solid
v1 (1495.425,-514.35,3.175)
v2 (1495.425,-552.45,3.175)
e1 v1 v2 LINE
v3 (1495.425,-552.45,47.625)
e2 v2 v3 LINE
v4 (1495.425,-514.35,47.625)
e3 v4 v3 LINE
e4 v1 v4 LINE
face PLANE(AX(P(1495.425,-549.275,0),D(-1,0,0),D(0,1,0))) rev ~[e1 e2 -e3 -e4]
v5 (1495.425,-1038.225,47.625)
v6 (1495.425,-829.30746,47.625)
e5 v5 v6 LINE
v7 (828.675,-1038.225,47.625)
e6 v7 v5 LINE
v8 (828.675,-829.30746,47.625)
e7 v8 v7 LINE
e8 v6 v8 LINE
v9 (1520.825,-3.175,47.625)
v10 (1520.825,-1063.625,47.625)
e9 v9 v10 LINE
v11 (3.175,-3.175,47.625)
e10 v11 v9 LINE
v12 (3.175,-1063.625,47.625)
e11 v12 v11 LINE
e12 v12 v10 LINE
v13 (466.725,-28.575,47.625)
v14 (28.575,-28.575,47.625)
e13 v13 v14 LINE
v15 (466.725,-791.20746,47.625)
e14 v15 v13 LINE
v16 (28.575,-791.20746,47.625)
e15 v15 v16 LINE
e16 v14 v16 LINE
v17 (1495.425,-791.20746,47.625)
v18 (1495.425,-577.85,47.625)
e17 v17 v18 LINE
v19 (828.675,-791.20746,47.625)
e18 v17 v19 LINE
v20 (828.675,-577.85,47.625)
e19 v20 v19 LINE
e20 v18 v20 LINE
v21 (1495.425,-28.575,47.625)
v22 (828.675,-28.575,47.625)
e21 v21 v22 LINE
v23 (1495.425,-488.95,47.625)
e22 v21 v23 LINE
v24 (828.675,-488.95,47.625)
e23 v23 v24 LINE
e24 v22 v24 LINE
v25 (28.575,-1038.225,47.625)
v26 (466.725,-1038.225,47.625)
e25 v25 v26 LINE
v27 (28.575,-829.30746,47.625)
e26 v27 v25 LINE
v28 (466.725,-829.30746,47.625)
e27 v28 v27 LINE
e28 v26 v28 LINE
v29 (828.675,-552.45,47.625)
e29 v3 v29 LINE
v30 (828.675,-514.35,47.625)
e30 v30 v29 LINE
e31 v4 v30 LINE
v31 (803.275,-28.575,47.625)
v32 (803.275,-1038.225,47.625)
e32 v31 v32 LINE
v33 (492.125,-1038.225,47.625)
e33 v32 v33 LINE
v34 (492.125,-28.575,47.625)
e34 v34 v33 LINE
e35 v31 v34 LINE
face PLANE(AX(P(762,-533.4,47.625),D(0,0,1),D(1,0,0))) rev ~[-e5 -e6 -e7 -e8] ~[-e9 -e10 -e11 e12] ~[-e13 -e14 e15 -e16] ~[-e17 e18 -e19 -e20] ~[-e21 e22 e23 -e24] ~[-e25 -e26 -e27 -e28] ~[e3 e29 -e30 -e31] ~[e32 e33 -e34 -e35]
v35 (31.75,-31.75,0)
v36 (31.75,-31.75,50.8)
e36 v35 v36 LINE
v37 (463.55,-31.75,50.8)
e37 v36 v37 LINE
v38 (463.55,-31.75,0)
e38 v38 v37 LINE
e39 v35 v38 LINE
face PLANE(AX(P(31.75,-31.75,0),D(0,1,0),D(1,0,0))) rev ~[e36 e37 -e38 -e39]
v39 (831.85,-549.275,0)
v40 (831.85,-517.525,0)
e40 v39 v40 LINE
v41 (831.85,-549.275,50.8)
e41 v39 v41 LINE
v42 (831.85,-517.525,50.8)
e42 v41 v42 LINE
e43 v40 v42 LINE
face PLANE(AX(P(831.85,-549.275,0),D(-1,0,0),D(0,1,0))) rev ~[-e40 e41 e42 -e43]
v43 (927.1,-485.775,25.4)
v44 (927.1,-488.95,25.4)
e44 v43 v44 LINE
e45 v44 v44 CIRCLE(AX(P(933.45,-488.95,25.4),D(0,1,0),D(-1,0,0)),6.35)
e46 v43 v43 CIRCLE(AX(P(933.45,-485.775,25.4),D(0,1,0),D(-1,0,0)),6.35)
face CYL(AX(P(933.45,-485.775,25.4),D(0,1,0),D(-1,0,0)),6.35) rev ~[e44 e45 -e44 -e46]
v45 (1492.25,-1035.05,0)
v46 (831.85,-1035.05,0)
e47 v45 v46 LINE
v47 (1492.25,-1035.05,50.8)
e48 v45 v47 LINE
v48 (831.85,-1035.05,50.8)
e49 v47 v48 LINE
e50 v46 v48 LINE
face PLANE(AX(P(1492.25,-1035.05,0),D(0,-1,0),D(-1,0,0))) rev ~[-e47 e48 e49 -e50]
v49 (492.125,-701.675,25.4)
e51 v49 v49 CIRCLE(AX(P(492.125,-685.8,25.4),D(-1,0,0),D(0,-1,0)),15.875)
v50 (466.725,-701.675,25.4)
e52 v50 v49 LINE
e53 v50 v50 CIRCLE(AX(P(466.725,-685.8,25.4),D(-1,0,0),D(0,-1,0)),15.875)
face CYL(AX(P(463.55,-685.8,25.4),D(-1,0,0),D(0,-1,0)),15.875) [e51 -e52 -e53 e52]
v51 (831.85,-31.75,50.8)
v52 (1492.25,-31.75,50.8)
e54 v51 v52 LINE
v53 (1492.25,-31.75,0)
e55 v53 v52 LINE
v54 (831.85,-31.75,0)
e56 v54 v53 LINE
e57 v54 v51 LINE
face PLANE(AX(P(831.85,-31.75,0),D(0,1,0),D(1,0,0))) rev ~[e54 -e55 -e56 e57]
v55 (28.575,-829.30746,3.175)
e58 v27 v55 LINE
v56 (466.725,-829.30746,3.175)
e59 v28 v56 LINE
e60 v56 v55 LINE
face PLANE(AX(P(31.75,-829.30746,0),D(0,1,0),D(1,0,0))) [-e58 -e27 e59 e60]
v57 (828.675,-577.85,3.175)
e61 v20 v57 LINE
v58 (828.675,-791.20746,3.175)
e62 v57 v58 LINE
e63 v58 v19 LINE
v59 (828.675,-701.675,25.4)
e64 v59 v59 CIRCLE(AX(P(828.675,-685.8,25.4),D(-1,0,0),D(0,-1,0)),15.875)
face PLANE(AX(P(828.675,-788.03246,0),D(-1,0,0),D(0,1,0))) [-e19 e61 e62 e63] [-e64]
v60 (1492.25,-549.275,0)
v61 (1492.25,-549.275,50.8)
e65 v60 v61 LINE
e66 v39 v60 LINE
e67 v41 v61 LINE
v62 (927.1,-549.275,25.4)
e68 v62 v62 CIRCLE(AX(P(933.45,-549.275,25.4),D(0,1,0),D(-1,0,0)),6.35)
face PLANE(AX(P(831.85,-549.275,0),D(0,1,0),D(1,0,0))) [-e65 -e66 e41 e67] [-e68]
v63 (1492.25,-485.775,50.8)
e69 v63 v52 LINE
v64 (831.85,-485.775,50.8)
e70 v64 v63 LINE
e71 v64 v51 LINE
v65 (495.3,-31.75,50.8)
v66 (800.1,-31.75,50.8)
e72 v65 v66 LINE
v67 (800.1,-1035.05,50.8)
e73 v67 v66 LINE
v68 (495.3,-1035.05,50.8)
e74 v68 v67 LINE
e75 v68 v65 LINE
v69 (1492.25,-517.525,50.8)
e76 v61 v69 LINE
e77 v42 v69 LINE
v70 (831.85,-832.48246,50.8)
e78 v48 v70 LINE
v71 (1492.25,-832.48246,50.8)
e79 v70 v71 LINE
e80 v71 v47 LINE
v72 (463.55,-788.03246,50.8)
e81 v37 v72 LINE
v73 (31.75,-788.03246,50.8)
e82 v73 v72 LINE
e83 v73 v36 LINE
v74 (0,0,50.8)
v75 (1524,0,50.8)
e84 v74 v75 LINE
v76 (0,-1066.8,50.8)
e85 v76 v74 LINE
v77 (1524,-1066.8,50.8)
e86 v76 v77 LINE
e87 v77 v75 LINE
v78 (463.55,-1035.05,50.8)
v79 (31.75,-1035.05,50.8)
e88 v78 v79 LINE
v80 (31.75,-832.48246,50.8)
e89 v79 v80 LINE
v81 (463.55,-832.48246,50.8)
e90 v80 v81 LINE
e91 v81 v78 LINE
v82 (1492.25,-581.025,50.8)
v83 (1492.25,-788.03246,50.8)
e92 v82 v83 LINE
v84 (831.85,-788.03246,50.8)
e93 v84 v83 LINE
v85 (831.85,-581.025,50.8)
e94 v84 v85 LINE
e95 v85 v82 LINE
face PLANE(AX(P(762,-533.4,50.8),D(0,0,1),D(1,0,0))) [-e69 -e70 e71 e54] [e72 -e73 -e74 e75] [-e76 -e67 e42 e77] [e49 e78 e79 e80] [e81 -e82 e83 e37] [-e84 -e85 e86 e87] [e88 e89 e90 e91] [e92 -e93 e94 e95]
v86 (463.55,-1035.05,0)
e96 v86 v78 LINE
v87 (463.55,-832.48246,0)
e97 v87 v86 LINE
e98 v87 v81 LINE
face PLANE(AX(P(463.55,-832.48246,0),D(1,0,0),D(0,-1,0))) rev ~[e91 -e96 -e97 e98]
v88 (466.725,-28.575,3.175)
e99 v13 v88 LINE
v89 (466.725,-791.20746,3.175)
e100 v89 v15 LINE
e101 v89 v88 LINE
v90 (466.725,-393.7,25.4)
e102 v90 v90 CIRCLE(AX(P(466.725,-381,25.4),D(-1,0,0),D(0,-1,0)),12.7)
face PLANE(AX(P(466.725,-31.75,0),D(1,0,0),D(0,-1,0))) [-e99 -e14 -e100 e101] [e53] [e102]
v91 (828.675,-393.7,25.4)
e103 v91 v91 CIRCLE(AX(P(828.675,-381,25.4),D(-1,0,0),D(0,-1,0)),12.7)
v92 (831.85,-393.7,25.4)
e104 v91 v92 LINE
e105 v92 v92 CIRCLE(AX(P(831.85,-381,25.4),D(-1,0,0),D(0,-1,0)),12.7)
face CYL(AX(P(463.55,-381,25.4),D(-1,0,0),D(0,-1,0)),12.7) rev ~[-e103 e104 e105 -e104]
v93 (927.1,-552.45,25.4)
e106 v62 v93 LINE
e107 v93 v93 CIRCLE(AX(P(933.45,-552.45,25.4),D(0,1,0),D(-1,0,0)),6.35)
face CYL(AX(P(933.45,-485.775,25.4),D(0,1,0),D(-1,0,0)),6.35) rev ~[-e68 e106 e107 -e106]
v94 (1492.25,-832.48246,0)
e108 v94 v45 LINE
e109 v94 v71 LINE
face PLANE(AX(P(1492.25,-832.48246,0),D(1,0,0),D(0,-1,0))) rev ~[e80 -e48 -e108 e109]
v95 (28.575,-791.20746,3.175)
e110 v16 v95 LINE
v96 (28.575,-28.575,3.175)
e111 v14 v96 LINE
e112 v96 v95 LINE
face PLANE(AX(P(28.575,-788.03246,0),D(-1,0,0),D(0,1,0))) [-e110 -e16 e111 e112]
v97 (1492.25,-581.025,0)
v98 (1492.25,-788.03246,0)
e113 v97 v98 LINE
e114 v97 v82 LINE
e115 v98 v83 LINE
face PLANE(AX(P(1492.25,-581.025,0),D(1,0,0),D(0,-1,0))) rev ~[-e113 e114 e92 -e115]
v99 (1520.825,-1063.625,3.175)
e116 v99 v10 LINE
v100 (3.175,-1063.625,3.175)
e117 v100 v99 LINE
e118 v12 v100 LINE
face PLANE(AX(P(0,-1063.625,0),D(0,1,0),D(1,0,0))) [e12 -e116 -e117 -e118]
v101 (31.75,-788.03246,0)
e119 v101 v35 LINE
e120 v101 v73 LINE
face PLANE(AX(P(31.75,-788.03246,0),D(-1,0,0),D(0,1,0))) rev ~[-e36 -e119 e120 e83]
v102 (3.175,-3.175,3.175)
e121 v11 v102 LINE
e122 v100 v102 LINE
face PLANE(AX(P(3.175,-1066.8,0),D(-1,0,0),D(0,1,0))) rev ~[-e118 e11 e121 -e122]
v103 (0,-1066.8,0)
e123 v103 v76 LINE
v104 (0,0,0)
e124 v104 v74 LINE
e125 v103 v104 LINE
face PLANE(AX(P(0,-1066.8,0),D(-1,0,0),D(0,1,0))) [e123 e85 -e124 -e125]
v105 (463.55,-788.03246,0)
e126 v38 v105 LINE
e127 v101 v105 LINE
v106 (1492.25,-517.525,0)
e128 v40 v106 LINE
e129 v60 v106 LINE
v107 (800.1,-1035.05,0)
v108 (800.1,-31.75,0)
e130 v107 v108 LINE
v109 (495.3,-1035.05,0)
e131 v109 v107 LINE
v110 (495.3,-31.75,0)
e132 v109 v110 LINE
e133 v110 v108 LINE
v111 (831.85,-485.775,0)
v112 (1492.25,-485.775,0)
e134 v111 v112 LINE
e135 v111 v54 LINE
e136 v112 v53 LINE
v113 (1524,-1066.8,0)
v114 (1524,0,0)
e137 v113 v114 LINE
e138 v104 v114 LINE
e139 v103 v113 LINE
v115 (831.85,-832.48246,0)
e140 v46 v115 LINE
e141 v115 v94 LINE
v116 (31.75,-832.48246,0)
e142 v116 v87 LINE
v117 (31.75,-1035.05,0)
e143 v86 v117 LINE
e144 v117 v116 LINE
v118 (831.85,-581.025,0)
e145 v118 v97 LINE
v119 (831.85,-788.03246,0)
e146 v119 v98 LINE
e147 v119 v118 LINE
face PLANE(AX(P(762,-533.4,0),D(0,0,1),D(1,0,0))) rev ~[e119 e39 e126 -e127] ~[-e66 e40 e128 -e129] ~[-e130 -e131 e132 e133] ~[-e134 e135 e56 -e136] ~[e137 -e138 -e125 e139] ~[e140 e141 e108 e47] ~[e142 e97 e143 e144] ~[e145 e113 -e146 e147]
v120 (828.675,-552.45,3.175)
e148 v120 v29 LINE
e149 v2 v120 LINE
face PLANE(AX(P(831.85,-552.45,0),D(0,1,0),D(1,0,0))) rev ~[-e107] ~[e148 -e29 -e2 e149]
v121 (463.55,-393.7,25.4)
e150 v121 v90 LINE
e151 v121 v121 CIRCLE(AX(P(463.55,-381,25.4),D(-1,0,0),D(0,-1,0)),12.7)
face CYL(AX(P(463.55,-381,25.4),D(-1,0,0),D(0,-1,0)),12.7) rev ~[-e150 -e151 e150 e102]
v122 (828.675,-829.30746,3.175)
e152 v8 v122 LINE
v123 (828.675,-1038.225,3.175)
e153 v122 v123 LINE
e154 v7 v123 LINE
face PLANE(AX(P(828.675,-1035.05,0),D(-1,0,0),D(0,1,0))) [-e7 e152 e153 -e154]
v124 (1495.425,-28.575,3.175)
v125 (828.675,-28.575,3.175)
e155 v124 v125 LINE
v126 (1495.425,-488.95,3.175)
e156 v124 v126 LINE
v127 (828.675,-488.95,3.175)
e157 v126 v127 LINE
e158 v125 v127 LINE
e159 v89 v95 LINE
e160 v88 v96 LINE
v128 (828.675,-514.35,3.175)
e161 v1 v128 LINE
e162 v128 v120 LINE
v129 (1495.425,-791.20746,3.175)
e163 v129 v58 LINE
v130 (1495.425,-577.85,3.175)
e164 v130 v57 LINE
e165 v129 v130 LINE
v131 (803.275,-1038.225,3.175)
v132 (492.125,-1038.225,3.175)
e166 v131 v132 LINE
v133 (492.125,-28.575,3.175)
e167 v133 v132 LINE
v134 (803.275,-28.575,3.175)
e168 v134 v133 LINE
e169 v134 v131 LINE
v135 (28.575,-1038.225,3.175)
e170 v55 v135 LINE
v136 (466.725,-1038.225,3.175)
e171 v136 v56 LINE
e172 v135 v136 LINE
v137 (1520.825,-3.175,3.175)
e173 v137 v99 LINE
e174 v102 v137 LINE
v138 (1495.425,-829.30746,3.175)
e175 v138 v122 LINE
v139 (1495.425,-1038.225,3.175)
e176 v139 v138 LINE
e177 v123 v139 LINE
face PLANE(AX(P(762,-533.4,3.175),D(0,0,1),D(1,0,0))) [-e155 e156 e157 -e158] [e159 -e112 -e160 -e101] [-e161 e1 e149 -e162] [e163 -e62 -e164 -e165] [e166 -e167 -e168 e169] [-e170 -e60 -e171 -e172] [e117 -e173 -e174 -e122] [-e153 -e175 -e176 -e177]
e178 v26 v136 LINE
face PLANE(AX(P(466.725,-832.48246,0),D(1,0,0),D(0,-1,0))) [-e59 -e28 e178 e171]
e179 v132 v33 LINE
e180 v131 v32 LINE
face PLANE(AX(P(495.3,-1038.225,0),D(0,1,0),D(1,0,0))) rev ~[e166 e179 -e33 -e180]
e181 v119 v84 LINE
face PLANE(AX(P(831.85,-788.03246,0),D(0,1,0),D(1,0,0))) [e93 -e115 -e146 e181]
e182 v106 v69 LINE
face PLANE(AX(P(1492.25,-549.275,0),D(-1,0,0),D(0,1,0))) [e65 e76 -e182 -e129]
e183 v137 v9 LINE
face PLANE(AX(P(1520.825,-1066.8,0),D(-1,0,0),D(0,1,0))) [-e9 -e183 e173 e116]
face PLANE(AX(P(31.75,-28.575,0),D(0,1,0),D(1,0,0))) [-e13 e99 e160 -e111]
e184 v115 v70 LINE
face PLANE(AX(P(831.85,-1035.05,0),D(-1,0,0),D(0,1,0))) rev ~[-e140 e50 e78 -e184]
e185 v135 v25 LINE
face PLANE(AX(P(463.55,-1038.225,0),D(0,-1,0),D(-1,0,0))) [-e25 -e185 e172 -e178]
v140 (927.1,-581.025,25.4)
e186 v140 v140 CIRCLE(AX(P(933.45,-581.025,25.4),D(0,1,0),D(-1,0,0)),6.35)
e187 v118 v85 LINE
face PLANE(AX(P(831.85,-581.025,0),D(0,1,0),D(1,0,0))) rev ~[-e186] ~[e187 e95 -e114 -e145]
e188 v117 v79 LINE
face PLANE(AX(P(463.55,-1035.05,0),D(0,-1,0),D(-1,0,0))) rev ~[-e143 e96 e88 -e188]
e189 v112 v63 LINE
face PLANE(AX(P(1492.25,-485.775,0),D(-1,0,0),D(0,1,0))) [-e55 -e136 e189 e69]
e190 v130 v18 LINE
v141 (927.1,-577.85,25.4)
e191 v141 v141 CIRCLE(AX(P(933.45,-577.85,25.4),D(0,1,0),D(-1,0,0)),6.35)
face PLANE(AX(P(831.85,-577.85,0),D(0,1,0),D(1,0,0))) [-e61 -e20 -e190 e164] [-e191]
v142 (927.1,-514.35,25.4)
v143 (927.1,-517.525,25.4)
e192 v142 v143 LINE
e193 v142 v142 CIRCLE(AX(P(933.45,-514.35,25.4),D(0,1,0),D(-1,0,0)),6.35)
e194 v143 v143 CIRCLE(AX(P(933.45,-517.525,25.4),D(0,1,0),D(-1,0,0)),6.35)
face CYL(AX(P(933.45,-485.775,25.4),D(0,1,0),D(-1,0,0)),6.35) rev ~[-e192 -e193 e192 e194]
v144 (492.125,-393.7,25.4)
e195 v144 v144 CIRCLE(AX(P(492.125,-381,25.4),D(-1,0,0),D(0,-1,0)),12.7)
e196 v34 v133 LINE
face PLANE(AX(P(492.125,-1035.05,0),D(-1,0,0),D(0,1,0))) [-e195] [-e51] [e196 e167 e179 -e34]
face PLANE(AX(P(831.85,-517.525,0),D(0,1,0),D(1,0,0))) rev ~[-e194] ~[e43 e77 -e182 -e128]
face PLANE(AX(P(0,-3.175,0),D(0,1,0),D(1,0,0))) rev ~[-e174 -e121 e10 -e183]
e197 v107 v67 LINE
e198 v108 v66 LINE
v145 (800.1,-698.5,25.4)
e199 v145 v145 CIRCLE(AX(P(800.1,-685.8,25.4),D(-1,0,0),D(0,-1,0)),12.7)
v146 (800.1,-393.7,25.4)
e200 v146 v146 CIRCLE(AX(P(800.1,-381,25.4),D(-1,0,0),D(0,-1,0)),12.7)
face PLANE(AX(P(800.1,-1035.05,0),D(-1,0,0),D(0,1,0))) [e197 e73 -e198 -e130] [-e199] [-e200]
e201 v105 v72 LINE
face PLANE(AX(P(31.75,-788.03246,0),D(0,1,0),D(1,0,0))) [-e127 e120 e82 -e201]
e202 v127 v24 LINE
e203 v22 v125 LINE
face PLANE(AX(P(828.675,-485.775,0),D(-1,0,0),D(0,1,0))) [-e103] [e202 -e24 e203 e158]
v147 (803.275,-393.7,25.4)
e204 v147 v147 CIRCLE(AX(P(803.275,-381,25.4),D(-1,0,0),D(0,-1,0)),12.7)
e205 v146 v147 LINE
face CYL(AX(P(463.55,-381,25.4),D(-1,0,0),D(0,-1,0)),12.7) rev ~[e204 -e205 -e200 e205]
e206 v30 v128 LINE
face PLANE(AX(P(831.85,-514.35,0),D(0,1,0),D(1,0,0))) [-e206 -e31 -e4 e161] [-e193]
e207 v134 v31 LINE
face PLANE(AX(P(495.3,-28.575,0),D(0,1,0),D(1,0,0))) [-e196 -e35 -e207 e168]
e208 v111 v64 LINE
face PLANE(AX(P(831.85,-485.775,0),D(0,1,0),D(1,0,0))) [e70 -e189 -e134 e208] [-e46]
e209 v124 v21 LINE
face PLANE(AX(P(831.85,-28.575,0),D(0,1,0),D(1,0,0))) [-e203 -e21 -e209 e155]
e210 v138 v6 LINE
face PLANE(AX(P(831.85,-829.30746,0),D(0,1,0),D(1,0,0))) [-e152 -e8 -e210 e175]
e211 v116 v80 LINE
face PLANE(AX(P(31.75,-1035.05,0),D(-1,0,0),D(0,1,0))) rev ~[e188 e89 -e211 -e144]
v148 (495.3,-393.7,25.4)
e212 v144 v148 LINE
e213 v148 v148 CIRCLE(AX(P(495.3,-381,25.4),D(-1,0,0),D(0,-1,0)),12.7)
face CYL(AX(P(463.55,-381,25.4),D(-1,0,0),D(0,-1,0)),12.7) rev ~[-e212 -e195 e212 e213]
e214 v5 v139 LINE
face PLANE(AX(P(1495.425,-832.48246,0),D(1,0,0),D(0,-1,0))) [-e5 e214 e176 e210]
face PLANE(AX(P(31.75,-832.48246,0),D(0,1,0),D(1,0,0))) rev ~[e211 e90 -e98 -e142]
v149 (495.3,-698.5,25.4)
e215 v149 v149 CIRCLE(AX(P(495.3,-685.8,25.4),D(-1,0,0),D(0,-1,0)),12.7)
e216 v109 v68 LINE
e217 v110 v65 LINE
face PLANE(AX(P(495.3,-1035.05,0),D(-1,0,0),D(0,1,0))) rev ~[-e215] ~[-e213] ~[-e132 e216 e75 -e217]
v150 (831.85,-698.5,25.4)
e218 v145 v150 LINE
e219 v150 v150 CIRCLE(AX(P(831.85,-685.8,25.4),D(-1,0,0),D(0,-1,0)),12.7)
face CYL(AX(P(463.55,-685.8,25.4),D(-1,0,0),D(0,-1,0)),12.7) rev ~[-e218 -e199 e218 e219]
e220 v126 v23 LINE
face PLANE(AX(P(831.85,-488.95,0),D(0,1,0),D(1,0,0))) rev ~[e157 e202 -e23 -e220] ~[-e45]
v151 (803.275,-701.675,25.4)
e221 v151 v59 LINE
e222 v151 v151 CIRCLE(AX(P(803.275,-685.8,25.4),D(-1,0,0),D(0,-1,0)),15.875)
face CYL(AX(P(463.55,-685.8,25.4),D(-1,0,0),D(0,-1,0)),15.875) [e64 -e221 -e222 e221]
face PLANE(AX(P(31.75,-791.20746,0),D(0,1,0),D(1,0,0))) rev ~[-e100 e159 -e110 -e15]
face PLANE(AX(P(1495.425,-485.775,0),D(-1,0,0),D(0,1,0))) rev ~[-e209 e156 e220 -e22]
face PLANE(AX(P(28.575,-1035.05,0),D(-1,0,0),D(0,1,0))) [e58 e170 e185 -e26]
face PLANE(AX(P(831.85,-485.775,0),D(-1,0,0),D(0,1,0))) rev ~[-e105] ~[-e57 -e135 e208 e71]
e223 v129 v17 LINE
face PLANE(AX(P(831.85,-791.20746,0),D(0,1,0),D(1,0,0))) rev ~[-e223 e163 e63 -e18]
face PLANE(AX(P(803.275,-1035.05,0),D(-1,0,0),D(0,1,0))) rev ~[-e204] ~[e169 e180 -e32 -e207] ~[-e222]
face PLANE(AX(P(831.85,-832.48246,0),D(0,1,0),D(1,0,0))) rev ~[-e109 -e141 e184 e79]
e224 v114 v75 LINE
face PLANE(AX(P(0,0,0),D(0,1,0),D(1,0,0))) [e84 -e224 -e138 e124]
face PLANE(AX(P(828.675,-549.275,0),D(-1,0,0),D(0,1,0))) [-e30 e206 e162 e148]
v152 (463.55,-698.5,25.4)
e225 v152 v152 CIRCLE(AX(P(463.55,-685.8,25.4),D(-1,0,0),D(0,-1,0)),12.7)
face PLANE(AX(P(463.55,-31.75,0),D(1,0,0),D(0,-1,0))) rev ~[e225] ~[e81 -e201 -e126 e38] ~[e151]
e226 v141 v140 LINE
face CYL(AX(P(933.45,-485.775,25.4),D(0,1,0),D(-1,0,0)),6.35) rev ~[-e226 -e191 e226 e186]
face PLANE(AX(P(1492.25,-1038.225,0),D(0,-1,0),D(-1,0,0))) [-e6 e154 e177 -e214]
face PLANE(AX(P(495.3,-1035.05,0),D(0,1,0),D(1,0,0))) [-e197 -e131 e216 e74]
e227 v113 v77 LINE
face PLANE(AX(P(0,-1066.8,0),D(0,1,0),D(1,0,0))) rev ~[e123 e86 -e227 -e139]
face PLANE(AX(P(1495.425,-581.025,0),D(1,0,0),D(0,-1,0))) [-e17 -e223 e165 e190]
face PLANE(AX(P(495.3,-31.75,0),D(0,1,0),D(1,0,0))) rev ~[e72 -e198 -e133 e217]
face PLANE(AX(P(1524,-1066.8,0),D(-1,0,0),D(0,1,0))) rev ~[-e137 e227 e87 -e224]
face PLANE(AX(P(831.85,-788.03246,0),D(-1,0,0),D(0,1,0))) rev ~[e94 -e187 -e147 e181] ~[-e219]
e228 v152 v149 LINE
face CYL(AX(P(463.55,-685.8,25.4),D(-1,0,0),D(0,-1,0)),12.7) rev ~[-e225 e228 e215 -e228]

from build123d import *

# Parameters (mm, degrees)
F0_W     = 1524
F0_H     = 1066.8
F0_W_2   = 304.8
F0_H_2   = 1003.3
F0_W_3   = 660.4
F0_H_3   = 31.75
F0_H_4   = 454.025
F0_W_4   = 431.8
F0_H_5   = 44.45
F1_DEPTH = 50.8
F2_R     = 12.7
F3_DEPTH = 406.4
F4_R     = 6.35
F5_DEPTH = 127
F6_T     = -3.175


# Not quite as in the source:
# - a feature names something its author has since deleted; it is built from what else it names


with BuildPart() as f1:
    # F0 (on Top) → F1 (new body)
    with BuildSketch(Plane.XY):
        with Locations((762, -533.4)):
            Rectangle(F0_W, F0_H)
        Polygon((1492.25, -1035.05), (831.85, -1035.05), (831.85, -832.48246), (831.85, -788.03246), (831.85, -581.025), (1492.25, -581.025), (1492.25, -788.03246), (1492.25, -832.48246), align=None, mode=Mode.SUBTRACT)
        Polygon((31.75, -788.03246), (31.75, -31.75), (463.55, -31.75), (463.55, -788.03246), (463.55, -832.48246), (463.55, -1035.05), (31.75, -1035.05), (31.75, -832.48246), align=None, mode=Mode.SUBTRACT)
        with Locations((647.7, -533.4)):
            Rectangle(F0_W_2, F0_H_2, mode=Mode.SUBTRACT)
        with Locations((1162.05, -533.4)):
            Rectangle(F0_W_3, F0_H_3, mode=Mode.SUBTRACT)
        with Locations((1162.05, -258.7625)):
            Rectangle(F0_W_3, F0_H_4, mode=Mode.SUBTRACT)
        with Locations((247.65, -810.25746)):
            Rectangle(F0_W_4, F0_H_5)
        with Locations((1162.05, -810.25746)):
            Rectangle(F0_W_3, F0_H_5)
    extrude(amount=F1_DEPTH)

    # F2 (on face) → F3 (cut)
    with BuildSketch(Plane(origin=(463.55, 0, 0), x_dir=(0, -1, 0), z_dir=(-1, 0, 0))):
        with Locations((381, 25.4)):
            Circle(F2_R)
        with Locations((685.8, 25.4)):
            Circle(F2_R)
    extrude(amount=-F3_DEPTH, mode=Mode.SUBTRACT)

    # F4 (on face) → F5 (cut)
    with BuildSketch(Plane(origin=(0, -485.775, 0), x_dir=(-1, 0, 0), z_dir=(0, 1, 0))):
        with Locations((-933.45, 25.4)):
            Circle(F4_R)
    extrude(amount=-F5_DEPTH, mode=Mode.SUBTRACT)

    # F6
    f6_openings = [f1.faces().sort_by_distance(p)[0] for p in [
        (815.975, -368.3, 25.4),
        (479.425, -368.3, 25.4),
        (939.8, -565.15, 25.4),
        (939.8, -501.65, 25.4),
    ]]
    offset(amount=F6_T, openings=f6_openings, kind=Kind.INTERSECTION)


solid = f1.part
